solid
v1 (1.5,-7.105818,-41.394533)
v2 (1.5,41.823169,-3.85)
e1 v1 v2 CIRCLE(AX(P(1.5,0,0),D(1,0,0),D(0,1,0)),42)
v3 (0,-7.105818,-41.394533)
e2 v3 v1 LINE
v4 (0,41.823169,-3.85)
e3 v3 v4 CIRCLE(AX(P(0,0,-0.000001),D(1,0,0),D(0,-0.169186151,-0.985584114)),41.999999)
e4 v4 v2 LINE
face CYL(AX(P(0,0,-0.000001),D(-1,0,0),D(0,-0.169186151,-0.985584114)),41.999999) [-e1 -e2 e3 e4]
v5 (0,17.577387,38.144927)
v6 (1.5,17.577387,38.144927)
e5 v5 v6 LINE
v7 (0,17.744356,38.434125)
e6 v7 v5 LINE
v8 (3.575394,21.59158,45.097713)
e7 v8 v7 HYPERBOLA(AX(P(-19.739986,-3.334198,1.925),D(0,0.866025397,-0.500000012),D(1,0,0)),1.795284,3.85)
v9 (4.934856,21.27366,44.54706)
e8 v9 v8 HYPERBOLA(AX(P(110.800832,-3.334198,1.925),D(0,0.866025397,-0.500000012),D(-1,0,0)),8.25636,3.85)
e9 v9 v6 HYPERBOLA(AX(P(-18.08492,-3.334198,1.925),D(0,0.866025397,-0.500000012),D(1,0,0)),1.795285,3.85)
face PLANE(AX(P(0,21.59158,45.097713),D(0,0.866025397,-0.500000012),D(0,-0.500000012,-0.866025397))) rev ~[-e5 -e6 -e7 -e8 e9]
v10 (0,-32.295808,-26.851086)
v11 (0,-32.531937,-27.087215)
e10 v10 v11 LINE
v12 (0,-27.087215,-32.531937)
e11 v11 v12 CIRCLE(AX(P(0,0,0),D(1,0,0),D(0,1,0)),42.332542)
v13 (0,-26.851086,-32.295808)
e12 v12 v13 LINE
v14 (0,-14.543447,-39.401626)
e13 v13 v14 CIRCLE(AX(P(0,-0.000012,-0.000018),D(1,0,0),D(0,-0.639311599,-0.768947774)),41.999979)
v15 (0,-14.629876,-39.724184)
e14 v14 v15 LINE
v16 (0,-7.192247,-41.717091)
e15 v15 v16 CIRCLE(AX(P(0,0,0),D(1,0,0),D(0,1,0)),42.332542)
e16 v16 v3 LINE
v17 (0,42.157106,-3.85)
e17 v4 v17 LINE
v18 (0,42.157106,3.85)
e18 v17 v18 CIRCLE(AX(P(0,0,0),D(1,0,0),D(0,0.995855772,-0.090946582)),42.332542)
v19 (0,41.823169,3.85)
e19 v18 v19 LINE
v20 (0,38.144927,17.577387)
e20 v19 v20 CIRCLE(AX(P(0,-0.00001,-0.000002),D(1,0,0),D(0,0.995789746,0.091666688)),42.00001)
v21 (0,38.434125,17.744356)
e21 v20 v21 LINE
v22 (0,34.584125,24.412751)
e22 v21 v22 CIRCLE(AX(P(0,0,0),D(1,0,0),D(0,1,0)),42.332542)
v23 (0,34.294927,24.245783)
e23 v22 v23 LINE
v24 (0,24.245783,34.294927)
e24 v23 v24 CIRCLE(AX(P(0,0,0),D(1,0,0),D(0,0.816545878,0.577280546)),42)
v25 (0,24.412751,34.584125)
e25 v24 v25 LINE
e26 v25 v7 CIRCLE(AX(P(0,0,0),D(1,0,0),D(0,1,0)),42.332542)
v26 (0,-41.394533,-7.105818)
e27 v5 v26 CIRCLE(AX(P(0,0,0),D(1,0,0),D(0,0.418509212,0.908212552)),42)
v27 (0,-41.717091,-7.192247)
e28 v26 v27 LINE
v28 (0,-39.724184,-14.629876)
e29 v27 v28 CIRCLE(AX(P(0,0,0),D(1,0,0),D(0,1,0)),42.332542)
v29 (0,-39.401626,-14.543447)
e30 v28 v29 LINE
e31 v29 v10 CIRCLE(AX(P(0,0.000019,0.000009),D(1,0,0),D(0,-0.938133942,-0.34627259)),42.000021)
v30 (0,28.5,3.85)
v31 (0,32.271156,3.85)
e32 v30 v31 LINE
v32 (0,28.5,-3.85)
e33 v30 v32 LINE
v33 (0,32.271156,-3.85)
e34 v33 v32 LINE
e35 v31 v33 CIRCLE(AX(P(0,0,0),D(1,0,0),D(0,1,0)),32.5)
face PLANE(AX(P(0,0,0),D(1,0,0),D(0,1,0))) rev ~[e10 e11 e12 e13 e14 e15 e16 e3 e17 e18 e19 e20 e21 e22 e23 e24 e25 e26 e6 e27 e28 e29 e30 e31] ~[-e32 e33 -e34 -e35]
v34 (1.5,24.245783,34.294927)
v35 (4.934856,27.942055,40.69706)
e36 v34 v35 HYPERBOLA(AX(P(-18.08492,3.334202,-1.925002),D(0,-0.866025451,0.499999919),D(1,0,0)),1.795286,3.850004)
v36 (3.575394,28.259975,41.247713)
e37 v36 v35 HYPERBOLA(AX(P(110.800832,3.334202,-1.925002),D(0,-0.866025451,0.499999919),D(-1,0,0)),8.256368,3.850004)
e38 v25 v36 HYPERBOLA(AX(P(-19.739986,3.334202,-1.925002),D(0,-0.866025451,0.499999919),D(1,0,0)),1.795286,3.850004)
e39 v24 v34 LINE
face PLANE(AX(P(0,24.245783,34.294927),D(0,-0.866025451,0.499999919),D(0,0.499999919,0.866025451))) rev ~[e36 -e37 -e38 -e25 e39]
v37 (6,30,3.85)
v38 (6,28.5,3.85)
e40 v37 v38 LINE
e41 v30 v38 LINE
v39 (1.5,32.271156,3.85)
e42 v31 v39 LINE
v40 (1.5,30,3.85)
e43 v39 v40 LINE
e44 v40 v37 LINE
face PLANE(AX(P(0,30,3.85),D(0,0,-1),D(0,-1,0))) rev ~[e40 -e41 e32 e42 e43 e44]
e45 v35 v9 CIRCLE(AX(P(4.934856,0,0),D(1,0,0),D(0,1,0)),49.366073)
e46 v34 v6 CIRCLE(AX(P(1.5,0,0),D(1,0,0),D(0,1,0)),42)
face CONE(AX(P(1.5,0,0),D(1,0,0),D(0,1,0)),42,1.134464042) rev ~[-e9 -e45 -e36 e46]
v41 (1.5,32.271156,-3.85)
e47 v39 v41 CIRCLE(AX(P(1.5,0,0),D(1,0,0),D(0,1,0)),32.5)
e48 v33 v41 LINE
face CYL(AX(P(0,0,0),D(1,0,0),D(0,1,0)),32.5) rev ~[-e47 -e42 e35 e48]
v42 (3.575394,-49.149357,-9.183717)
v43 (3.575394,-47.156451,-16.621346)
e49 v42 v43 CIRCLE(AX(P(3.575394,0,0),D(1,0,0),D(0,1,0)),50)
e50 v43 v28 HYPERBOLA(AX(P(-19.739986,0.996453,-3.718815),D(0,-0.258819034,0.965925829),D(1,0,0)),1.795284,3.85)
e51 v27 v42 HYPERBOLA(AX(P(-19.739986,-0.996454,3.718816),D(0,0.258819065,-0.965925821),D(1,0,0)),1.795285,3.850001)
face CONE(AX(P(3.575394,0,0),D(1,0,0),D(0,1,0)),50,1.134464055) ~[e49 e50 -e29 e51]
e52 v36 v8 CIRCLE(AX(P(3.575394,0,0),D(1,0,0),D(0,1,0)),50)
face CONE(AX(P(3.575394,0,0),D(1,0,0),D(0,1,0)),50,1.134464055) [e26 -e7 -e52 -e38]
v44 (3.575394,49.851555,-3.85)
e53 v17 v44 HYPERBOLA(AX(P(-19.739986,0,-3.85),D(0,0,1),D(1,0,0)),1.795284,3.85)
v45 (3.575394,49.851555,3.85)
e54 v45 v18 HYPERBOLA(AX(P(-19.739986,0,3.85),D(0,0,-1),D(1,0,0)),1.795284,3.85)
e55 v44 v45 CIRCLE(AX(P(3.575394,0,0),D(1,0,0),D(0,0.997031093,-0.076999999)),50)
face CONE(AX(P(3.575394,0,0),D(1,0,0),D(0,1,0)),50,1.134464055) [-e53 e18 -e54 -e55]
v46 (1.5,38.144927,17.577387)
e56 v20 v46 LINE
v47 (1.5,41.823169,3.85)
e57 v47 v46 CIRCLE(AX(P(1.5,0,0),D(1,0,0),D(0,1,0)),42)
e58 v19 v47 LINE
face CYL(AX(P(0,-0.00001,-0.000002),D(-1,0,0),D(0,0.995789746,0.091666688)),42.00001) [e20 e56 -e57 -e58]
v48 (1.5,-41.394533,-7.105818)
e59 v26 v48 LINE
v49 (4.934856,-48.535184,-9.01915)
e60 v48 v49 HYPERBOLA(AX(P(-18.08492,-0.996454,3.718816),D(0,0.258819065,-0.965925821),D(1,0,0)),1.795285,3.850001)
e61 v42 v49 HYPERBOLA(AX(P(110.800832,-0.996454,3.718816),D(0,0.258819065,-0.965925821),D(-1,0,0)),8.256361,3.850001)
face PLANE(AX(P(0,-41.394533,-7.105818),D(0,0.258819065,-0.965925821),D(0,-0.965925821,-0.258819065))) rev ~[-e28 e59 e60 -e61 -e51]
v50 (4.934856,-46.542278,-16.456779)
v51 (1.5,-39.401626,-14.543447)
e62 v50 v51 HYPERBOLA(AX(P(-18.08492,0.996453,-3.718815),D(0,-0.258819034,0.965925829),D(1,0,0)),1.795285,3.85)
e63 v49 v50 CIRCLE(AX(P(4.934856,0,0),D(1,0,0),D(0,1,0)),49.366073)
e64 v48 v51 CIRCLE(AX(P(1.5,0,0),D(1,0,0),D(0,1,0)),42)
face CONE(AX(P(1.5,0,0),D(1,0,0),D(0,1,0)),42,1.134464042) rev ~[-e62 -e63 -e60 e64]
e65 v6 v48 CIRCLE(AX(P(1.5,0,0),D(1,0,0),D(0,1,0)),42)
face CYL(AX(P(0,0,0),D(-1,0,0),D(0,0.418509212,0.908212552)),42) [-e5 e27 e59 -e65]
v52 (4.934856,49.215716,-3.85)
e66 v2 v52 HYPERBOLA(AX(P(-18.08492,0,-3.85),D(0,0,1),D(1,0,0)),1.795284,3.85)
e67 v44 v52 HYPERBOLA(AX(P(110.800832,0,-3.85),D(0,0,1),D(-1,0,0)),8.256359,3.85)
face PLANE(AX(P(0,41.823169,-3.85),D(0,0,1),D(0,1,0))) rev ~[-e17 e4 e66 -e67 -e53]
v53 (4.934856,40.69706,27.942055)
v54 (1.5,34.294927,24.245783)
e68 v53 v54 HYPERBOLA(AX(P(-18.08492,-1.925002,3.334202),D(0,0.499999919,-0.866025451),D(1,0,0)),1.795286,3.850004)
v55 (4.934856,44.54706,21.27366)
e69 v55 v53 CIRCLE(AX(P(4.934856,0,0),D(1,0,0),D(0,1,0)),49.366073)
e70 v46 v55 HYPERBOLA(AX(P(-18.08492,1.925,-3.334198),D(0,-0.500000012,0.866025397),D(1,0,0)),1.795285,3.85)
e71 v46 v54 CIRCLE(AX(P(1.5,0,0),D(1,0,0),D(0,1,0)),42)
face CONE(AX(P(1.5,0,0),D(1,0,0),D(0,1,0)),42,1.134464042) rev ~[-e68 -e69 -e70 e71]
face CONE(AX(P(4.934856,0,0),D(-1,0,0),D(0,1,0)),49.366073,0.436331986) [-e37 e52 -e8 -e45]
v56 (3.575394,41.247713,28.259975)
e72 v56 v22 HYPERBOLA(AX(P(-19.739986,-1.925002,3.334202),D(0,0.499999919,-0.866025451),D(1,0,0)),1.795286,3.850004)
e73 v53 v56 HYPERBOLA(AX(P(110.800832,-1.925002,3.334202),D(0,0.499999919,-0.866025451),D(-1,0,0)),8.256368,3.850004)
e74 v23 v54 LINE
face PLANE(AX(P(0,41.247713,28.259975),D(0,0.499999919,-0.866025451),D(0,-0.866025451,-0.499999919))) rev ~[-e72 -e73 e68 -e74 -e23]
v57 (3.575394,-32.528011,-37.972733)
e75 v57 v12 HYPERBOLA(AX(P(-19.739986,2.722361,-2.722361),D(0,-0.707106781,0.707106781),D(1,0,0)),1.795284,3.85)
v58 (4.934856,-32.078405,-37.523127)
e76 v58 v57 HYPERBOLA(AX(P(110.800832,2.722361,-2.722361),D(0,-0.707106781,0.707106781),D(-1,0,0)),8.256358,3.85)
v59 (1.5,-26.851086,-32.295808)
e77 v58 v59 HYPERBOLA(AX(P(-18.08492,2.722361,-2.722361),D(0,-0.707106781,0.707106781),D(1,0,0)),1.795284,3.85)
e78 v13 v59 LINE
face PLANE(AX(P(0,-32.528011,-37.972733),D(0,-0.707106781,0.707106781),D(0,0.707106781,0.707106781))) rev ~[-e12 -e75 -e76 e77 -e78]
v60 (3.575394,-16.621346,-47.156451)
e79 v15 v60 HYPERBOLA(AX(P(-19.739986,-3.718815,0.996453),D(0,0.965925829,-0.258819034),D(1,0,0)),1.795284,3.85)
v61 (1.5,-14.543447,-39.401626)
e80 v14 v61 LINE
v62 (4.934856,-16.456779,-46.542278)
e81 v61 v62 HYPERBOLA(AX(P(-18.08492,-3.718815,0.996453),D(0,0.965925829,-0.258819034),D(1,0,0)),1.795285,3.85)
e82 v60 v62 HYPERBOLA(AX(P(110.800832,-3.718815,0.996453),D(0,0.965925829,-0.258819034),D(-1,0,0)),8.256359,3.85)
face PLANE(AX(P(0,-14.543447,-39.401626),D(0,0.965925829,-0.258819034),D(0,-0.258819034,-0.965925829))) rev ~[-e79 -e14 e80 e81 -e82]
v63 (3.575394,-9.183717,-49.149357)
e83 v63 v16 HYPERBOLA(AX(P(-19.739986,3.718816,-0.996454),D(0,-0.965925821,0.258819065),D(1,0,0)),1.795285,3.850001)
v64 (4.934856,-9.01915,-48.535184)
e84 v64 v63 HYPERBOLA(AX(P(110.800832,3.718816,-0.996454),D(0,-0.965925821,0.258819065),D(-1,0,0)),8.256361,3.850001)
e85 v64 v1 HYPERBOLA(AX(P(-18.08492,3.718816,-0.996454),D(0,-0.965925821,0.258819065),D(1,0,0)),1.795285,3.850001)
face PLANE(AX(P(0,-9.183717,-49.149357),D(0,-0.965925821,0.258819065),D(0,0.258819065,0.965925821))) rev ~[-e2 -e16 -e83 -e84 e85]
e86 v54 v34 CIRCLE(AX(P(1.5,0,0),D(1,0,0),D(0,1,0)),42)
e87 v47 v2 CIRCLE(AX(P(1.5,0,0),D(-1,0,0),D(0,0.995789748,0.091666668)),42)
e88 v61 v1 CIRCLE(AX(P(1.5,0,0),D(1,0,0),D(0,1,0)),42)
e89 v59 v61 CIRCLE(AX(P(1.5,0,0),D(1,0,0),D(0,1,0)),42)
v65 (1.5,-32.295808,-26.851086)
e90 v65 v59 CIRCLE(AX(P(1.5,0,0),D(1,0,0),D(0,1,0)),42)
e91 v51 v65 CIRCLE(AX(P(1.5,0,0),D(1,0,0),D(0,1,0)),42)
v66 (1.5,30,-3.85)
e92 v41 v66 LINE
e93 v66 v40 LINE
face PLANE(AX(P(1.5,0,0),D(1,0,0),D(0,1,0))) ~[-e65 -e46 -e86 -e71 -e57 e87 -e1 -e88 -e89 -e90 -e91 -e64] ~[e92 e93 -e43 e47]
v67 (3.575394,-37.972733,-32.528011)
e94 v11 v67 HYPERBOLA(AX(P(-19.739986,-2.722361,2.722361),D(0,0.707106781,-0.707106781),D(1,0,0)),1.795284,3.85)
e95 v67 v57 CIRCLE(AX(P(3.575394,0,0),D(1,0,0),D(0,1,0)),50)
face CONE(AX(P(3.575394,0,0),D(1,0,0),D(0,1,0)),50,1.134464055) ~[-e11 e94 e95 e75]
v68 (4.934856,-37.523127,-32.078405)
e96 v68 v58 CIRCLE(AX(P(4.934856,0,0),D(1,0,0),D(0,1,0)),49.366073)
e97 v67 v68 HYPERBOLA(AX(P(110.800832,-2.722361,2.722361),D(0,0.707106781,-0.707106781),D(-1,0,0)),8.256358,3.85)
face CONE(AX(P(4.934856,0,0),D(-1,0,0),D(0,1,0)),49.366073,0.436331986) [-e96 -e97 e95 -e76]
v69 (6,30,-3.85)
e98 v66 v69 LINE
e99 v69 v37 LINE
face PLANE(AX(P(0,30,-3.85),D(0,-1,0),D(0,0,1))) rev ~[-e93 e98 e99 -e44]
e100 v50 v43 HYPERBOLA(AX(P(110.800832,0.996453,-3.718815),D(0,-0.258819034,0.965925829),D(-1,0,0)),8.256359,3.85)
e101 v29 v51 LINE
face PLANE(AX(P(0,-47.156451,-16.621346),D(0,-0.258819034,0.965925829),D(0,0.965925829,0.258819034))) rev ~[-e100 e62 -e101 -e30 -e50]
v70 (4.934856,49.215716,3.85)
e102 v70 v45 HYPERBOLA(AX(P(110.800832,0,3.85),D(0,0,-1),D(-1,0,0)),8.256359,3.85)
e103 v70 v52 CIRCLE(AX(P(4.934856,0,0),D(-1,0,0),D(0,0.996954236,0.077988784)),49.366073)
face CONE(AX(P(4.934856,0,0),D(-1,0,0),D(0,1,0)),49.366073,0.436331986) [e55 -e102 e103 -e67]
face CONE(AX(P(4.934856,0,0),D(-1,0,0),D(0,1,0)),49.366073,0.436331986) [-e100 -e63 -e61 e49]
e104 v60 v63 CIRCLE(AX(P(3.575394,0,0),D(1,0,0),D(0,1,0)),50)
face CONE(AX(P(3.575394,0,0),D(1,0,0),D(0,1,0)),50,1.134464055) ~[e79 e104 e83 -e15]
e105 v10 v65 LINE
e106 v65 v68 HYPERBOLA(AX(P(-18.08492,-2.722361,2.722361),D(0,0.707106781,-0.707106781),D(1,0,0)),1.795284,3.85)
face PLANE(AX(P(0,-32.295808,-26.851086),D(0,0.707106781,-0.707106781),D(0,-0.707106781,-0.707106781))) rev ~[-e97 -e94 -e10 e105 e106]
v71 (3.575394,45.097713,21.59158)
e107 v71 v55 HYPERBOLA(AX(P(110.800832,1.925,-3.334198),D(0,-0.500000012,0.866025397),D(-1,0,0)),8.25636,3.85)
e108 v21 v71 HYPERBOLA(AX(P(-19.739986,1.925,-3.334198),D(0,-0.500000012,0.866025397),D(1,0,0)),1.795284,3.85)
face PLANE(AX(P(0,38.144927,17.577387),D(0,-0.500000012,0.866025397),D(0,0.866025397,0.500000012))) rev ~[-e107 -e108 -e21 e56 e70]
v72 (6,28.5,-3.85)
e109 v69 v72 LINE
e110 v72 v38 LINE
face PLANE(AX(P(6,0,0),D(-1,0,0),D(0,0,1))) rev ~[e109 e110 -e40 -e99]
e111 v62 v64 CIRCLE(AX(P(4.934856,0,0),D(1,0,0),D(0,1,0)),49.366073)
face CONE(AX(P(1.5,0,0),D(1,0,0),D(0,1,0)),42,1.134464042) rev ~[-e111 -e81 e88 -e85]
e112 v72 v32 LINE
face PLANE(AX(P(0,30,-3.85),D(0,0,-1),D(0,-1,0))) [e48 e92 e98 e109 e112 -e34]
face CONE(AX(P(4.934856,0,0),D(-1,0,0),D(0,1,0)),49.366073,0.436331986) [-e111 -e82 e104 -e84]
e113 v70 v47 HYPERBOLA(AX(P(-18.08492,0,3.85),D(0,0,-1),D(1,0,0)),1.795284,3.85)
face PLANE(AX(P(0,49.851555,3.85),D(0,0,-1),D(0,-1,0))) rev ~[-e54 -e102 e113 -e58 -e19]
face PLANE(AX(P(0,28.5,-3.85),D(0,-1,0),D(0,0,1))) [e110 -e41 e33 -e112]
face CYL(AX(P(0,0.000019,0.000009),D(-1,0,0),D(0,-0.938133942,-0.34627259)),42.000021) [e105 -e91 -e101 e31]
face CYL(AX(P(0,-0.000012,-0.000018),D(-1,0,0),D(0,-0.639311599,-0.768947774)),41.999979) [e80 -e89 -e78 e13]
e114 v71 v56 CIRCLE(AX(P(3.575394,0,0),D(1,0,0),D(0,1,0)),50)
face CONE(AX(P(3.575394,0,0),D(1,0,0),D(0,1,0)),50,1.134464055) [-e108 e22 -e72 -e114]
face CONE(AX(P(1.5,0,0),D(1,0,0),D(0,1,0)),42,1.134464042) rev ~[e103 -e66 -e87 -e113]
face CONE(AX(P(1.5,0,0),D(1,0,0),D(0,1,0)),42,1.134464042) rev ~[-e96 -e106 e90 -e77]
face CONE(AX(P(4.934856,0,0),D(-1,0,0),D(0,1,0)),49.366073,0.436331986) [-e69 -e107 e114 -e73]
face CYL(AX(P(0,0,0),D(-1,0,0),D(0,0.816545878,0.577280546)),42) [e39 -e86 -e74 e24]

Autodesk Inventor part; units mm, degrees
ref_plane "YZ Plane" through (0, 0, 0) normal (1, 0, 0) x (0, 1, 0)
ref_plane "XZ Plane" through (0, 0, 0) normal (0, 1, 0) x (-1, 0, 0)
sketch "草图1" plane through (0, 0, 0) normal (0, 0, 1) x (1, 0, 0)
  line L0 (-0.580263, 0) -> (3.481577, 0)
  line L1 (0, 3.8) -> (0, 13.95)
  line L2 (0, 42.332542) -> (3.575394, 50)
  line L3 (3.575394, 50) -> (4.934856, 49.366073)
  line L4 (4.934856, 49.366073) -> (1.5, 42)
  line L5 (1.5, 42) -> (1.5, 32.5)
  line L6 (1.5, 32.5) -> (0, 32.5)
  dimension "d1" = 1.5
  dimension "d2" = 65
  dimension "d3" = 84
  dimension "d4" = 100
  dimension "d5" = 25
  dimension "d6" = 1.5
sketch "草图1 outline for 轴承体" plane through (0, 0, 0) normal (0, 0, 1) x (1, 0, 0)
  line L0 (3.575394, 50) -> (0, 42.332542)
  line L1 (4.934856, 49.366073) -> (3.575394, 50)
  line L2 (1.5, 42) -> (4.934856, 49.366073)
  line L3 (1.5, 32.5) -> (1.5, 42)
  line L4 (0, 32.5) -> (1.5, 32.5)
  line L5 (0, 42.332542) -> (0, 32.5)
revolve "轴承体" add sketch "草图1 outline for 轴承体" angle 360 about axis through (-10, 0, 0) along (1, 0, 0)
sketch "草图2" plane through (0, 0, 0) normal (-1, 0, 0) x (0, 0, 1)
  line L0 (0, -70) -> (0, 70)
  line L1 (3.85, 32.271156) -> (3.85, 28.5)
  line L2 (3.85, 28.5) -> (0, 28.5)
  line L3 (-3.85, 32.271156) -> (-3.85, 28.5)
  line L4 (-3.85, 28.5) -> (0, 28.5)
  line L5 (-70, 0) -> (70, 0)
  circle A0 centre (0, 0) radius 32.5
  circle A1 centre (0, 0) radius 50
  circle A2 centre (0, 0) radius 42
  line L6 (-3.85, 30) -> (3.85, 30)
  circle A3 centre (0, 0) radius 42.332542
  line L7 (3.85, 41.823169) -> (3.85, 49.851555)
  line L8 (0, 70) -> (0, -70)
  line L9 (0, 0) -> (25, 43.30127) construction
  line L10 (17.577387, 38.144927) -> (21.59158, 45.097713)
  line L11 (24.245783, 34.294927) -> (28.259975, 41.247713)
  line L12 (-3.85, 41.823169) -> (-3.85, 49.851555)
  line L13 (0, 0) -> (43.30127, 25) construction
  line L14 (34.294927, 24.245783) -> (41.247713, 28.259975)
  line L15 (38.144927, 17.577387) -> (45.097713, 21.59158)
  line L16 (0, 0) -> (-48.296291, -12.940952) construction
  line L17 (-41.394533, -7.105818) -> (-49.149357, -9.183717)
  line L18 (-39.401626, -14.543447) -> (-47.156451, -16.621346)
  line L19 (0, 0) -> (-35.355339, -35.355339) construction
  line L20 (0, 0) -> (-12.940952, -48.296291) construction
  line L21 (-32.295808, -26.851086) -> (-37.972733, -32.528011)
  line L22 (-26.851086, -32.295808) -> (-32.528011, -37.972733)
  line L23 (-14.543447, -39.401626) -> (-16.621346, -47.156451)
  line L24 (-7.105818, -41.394533) -> (-9.183717, -49.149357)
  dimension "d9" = 7.7
  dimension "d21" = 1.5
  dimension "d25" = 61
  dimension "d32" = 7.7
  dimension "d34" = 7.7
  dimension "d36" = 30
  dimension "d38" = 3.85
  dimension "d39" = 30
  dimension "d40" = 15
  dimension "d41" = 7.7
  dimension "d42" = 30
  dimension "d43" = 30
  dimension "d45" = 7.7
  dimension "d47" = 7.7
sketch "草图2 outline for 切口" plane through (0, 0, 0) normal (-1, 0, 0) x (0, 0, 1)
  arc A0 (-14.543447, -39.401626) -> (-26.851086, -32.295808) centre (0, 0) cw
  line L0 (-16.621346, -47.156451) -> (-14.543447, -39.401626)
  arc A1 (-32.528011, -37.972733) -> (-16.621346, -47.156451) centre (0, 0) ccw
  line L1 (-26.851086, -32.295808) -> (-32.528011, -37.972733)
  arc A2 (-32.295808, -26.851086) -> (-39.401626, -14.543447) centre (0, 0) cw
  line L2 (-37.972733, -32.528011) -> (-32.295808, -26.851086)
  arc A3 (-47.156451, -16.621346) -> (-37.972733, -32.528011) centre (0, 0) ccw
  line L3 (-39.401626, -14.543447) -> (-47.156451, -16.621346)
  line L4 (3.85, 49.851555) -> (3.85, 41.823169)
  arc A4 (21.59158, 45.097713) -> (3.85, 49.851555) centre (0, 0) ccw
  line L5 (17.577387, 38.144927) -> (21.59158, 45.097713)
  arc A5 (3.85, 41.823169) -> (17.577387, 38.144927) centre (0, 0) cw
  line L6 (28.259975, 41.247713) -> (24.245783, 34.294927)
  arc A6 (41.247713, 28.259975) -> (28.259975, 41.247713) centre (0, 0) ccw
  line L7 (34.294927, 24.245783) -> (41.247713, 28.259975)
  arc A7 (24.245783, 34.294927) -> (34.294927, 24.245783) centre (0, 0) cw
  arc A8 (-41.394533, -7.105818) -> (-3.85, 41.823169) centre (0, 0) cw
  line L8 (-49.149357, -9.183717) -> (-41.394533, -7.105818)
  arc A9 (-3.85, 49.851555) -> (-49.149357, -9.183717) centre (0, 0) ccw
  line L9 (-3.85, 41.823169) -> (-3.85, 49.851555)
  line L10 (45.097713, 21.59158) -> (38.144927, 17.577387)
  arc A10 (-9.183717, -49.149357) -> (45.097713, 21.59158) centre (0, 0) ccw
  line L11 (-7.105818, -41.394533) -> (-9.183717, -49.149357)
  arc A11 (38.144927, 17.577387) -> (-7.105818, -41.394533) centre (0, 0) cw
extrude "切口" cut sketch "草图2 outline for 切口" against normal through all
extrude "榫1" add sketch "草图2" against normal blind 1.5 contours L4 L3 L6 L0 | L0 L6 L1 L2 | A0 L0 L6 L3 | L1 L6 L0 A0
extrude "榫2" add sketch "草图2" against normal blind 6 contours L4 L3 L6 L0 | L0 L6 L1 L2
ref_plane "Work Plane1" through (0.75, 0, 0) normal (0, 0, -1) x (1, 0, 0)
equation "\"d1\" = SD"
equation "\"d2\" = SD1"
equation "\"d3\" = LADI"
equation "\"d4\" = SD2"
equation "\"d5\" = FAWI"
equation "\"d6\" = SD"
equation "\"d9\" = TW0"
equation "\"d21\" = SD"
equation "\"d25\" = SD3"
equation "\"d32\" = TW0"
equation "\"d34\" = TW0"
equation "\"d36\" = SEWI"
equation "\"d39\" = SEWI"
equation "\"d40\" = ANG1"
equation "\"d41\" = TW0"
equation "\"d42\" = SEWI"
equation "\"d43\" = SEWI"
equation "\"d45\" = TW0"
equation "\"d47\" = TW0"
equation "\"d17\" = SD"
equation "\"d13\" = SD"
equation "\"d23\" = TL1"
equation "\"FAWI\" = 25deg"
equation "\"SD1\" = 65"
equation "\"SD2\" = 100"
equation "\"SD\" = 1.5"
equation "\"TW0\" = 7.7"
equation "\"LADI\" = 84"
equation "\"d8\" = SD1"
equation "\"TL1\" = 6"
equation "\"SD3\" = 61"
equation "\"SEWI\" = 30deg"
equation "\"ANG1\" = 15deg"
equation "\"RR\" = 0.1"
equation "\"NND\" = 64"
equation "\"PB\" = TW0"
equation "\"PNT\" = TL1"
properties part number "垫圈 GB 858 64" material "钢，软"
